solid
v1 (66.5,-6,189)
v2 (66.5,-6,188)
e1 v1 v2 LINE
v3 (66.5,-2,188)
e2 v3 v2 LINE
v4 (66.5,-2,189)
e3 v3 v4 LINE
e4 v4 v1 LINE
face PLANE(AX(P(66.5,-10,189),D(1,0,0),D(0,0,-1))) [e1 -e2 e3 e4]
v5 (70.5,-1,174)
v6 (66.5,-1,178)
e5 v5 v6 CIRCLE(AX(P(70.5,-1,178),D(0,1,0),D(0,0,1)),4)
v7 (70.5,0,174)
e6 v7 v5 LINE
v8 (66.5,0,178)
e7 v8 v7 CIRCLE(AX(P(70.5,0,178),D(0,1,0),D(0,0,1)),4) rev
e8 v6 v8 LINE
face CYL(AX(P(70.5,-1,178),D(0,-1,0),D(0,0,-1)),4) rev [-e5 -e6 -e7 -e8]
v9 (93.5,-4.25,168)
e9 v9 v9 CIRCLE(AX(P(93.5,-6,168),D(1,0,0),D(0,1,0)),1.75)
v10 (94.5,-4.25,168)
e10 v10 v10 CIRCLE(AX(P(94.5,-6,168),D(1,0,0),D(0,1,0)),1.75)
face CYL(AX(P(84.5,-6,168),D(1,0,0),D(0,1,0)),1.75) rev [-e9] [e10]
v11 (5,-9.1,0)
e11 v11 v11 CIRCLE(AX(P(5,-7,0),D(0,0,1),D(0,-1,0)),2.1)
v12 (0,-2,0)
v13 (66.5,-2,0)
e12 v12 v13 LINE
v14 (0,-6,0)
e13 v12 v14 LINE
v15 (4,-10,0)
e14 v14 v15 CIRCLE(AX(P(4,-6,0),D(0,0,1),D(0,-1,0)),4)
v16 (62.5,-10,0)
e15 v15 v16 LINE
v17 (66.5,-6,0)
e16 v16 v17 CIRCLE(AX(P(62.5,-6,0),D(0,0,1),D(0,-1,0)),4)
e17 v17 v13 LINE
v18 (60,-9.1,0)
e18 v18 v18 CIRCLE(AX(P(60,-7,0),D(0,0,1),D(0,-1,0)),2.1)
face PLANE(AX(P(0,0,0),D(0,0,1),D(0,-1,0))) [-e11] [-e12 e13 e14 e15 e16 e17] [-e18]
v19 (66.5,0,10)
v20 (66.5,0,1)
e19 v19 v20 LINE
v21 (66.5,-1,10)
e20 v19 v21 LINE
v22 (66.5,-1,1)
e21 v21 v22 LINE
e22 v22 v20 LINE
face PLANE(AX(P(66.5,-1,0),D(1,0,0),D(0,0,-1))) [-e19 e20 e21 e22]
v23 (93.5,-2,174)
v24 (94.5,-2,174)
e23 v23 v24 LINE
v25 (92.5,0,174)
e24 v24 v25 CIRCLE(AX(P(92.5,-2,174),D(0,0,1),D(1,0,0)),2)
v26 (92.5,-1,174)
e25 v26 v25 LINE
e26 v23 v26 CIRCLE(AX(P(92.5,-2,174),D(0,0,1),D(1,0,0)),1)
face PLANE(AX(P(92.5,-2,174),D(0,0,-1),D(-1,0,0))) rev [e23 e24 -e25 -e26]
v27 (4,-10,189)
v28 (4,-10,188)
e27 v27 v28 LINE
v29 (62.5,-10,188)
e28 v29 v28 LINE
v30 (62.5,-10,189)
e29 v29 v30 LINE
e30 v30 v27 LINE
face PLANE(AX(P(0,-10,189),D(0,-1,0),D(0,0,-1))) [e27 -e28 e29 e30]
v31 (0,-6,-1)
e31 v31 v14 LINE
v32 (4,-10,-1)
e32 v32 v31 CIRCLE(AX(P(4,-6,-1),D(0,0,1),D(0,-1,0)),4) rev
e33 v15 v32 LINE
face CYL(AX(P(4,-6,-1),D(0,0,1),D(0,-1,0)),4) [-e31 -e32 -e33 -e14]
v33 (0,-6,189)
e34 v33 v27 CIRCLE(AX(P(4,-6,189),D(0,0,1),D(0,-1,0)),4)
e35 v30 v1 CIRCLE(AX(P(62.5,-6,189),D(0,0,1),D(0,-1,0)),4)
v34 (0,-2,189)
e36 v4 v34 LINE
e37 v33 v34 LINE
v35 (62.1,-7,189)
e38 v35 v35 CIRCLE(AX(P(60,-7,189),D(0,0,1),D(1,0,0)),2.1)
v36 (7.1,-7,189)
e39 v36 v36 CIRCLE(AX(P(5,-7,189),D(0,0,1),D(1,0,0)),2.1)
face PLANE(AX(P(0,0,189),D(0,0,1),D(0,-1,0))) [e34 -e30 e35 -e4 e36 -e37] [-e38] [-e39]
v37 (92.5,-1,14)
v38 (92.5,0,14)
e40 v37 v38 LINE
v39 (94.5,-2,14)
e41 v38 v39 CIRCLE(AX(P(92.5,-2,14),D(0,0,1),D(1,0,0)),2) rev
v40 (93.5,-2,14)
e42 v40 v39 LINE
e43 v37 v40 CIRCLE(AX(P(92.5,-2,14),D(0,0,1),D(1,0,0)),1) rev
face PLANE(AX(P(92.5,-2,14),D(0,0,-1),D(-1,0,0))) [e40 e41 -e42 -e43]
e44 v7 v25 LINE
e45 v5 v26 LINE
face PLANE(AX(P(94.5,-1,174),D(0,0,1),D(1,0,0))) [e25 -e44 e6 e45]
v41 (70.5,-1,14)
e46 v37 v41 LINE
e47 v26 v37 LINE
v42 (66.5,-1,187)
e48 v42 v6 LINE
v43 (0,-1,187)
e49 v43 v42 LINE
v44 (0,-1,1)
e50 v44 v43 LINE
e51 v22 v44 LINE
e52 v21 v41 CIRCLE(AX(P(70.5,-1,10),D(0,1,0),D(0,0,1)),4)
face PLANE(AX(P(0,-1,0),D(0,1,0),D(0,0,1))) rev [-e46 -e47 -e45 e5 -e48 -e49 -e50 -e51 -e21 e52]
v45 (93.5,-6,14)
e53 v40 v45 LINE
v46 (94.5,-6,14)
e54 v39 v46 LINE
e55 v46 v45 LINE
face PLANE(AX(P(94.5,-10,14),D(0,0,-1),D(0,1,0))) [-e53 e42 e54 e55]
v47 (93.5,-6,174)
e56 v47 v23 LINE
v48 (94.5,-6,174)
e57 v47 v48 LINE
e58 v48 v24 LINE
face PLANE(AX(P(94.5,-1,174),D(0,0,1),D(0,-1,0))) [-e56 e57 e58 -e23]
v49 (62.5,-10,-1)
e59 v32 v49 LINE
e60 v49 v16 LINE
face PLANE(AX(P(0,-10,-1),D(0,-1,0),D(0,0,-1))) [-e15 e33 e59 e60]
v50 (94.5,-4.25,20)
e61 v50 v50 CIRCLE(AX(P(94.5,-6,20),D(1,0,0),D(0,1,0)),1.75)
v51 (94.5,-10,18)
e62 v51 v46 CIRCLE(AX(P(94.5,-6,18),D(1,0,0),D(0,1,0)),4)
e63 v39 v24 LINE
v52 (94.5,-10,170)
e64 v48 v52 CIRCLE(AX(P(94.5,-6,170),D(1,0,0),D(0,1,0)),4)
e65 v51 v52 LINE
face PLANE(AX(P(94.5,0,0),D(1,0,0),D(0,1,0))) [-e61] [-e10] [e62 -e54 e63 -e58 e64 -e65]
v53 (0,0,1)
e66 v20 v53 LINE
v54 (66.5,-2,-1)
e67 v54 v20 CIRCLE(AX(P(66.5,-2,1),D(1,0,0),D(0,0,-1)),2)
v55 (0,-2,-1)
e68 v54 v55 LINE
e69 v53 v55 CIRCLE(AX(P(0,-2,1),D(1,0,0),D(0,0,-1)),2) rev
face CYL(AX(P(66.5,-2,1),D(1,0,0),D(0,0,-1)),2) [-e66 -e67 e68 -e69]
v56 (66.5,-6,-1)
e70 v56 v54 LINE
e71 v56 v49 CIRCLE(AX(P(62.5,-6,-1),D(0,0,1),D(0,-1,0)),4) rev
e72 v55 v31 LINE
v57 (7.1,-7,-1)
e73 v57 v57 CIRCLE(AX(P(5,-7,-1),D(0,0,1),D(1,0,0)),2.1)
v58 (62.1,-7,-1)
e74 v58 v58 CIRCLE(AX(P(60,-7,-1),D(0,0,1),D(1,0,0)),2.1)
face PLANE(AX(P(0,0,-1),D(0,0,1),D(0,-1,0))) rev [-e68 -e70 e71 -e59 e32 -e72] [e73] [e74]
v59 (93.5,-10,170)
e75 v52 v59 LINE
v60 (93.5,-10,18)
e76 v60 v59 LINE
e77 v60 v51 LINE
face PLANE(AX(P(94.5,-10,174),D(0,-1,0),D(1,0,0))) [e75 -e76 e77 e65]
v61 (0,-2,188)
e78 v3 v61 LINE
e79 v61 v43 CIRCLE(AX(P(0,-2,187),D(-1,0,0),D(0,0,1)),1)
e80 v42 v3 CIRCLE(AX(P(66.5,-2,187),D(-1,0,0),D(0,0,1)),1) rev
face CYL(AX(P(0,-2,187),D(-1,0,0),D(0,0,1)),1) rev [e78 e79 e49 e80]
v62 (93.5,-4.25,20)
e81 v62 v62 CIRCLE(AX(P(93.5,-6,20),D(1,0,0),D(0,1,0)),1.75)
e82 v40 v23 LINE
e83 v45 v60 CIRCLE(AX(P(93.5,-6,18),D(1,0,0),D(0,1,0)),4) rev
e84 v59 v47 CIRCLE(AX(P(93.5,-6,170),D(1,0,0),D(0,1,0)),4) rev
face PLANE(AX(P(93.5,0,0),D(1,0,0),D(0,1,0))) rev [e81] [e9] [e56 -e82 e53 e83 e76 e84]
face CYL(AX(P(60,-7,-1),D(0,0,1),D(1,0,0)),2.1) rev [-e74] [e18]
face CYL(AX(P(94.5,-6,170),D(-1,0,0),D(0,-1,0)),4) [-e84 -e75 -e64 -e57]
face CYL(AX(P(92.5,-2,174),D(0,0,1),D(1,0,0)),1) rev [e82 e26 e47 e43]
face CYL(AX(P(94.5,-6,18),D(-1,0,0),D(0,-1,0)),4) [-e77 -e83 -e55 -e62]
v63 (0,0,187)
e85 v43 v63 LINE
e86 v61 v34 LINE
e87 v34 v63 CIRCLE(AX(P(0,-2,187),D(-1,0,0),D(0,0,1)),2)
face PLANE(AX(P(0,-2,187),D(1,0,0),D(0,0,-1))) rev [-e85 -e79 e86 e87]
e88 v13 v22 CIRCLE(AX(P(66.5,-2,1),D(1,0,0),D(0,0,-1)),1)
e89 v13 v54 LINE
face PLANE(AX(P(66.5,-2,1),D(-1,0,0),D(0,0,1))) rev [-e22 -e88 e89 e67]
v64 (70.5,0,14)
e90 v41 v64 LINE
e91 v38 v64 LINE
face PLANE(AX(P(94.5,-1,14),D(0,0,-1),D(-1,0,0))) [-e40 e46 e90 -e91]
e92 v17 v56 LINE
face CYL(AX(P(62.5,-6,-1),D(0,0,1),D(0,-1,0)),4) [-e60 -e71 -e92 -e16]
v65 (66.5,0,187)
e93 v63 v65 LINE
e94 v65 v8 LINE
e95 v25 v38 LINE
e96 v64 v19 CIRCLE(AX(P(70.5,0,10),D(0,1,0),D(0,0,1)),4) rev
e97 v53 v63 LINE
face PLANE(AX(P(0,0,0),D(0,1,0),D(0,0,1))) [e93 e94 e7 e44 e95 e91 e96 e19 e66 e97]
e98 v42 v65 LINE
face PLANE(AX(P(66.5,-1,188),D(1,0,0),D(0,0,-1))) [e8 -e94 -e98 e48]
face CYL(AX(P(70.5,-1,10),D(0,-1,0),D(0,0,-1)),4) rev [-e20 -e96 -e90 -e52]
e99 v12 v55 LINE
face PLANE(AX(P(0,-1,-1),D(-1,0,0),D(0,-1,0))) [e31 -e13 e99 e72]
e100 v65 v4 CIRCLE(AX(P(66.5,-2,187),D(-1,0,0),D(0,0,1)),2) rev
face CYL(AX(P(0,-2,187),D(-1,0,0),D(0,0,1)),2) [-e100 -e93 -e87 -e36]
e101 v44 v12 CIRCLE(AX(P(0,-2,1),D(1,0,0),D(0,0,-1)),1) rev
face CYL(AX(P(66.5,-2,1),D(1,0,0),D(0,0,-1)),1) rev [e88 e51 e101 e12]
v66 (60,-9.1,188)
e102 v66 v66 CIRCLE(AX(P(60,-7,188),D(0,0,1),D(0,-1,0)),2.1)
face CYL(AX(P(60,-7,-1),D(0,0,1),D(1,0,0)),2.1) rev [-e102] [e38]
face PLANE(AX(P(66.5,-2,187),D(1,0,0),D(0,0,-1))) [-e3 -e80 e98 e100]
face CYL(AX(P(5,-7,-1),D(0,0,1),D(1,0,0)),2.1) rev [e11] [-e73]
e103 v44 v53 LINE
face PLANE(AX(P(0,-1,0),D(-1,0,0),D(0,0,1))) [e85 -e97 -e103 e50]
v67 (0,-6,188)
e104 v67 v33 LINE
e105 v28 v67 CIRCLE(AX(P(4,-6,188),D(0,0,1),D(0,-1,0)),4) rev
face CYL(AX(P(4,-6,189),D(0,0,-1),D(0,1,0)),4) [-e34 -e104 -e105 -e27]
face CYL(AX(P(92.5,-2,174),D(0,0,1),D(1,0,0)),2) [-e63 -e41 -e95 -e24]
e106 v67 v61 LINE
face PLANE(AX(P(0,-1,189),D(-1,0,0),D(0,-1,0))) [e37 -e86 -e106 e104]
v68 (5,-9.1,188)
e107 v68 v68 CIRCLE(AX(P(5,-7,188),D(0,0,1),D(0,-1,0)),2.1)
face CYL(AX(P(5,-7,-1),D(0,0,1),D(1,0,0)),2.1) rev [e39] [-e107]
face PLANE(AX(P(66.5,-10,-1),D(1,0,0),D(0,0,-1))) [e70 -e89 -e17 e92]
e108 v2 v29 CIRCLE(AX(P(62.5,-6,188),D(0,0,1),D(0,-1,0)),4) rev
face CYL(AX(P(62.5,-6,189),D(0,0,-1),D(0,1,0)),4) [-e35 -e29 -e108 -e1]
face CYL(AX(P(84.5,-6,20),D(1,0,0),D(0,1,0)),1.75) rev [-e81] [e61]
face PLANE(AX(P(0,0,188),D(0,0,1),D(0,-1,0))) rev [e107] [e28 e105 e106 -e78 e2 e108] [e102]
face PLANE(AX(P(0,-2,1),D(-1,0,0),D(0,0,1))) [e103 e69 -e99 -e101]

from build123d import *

# Parameters (mm, degrees)
SM_BASE_FLANGE_1_DEPTH             = 1
SM_EDGE_FLANGE_1_STRIP_W           = 6
SM_EDGE_FLANGE_1_STRIP_H           = 1
SM_EDGE_FLANGE_1_STRIP_CUT_DEPTH   = 160
SM_EDGE_FLANGE_1_DEPTH             = 160
SM_EDGE_FLANGE_2_STRIP_W           = 6
SM_EDGE_FLANGE_2_STRIP_H           = 1
SM_EDGE_FLANGE_2_STRIP_CUT_DEPTH   = 66.5
SM_EDGE_FLANGE_2_STRIP_2_W         = 6
SM_EDGE_FLANGE_2_STRIP_2_H         = 1
SM_EDGE_FLANGE_2_STRIP_CUT_2_DEPTH = 66.5
SM_EDGE_FLANGE_2_DEPTH             = 66.5
SM_EDGE_FLANGE_2_BEND_DEPTH        = 66.5
SKETCH_15_R                        = 1.75
CUT_EXTRUDE_1_DEPTH                = 10
FILLET_1_R                         = 4
SKETCH_16_R                        = 2.1
CUT_EXTRUDE_2_DEPTH                = 213.438814721


# Sheet-metal steps are written as plain solids
with BuildPart() as part:
    # Sketch 1 → Базовая кромка1 (new body)
    with BuildSketch(Plane(origin=(0, 0, 0), x_dir=(1, 0, 0), z_dir=(0, 1, 0))):
        Polygon((0, 0), (66.5, 0), (66.5, -14), (94.5, -14), (94.5, -174), (66.5, -174), (66.5, -188), (0, -188), align=None)
    extrude(amount=-SM_BASE_FLANGE_1_DEPTH)

    # Ребро-кромка1 strip (across the edge) → Ребро-кромка1 strip cut (cut)
    with BuildSketch(Plane(origin=(94.5, -1, 14), x_dir=(-1, 0, 0), z_dir=(0, 0, 1))):
        with Locations((-1, -0.5)):
            Rectangle(SM_EDGE_FLANGE_1_STRIP_W, SM_EDGE_FLANGE_1_STRIP_H)
    extrude(amount=SM_EDGE_FLANGE_1_STRIP_CUT_DEPTH, mode=Mode.SUBTRACT)

    # Ребро-кромка1 section (across the edge) → Ребро-кромка1 (add)
    with BuildSketch(Plane(origin=(94.5, -1, 14), x_dir=(-1, 0, 0), z_dir=(0, 0, 1))):
        with BuildLine():
            Line((0, 1), (0, 9))
            Line((0, 9), (1, 9))
            Line((1, 9), (1, 1))
            ThreePointArc((1, 1), (1.292893219, 0.292893219), (2, 0))
            Line((2, 0), (2, -1))
            ThreePointArc((2, -1), (0.585786438, -0.414213562), (0, 1))
        make_face()
    extrude(amount=SM_EDGE_FLANGE_1_DEPTH)

    # Ребро-кромка2 strip (across the edge) → Ребро-кромка2 strip cut (cut)
    with BuildSketch(Plane(origin=(66.5, -1, 188), x_dir=(0, 0, -1), z_dir=(-1, 0, 0))):
        with Locations((-2, -0.5)):
            Rectangle(SM_EDGE_FLANGE_2_STRIP_W, SM_EDGE_FLANGE_2_STRIP_H)
    extrude(amount=SM_EDGE_FLANGE_2_STRIP_CUT_DEPTH, mode=Mode.SUBTRACT)

    # Ребро-кромка2 strip 2 (across the edge) → Ребро-кромка2 strip cut 2 (cut)
    with BuildSketch(Plane(origin=(0, -1, 0), x_dir=(0, 0, 1), z_dir=(1, 0, 0))):
        with Locations((-2, -0.5)):
            Rectangle(SM_EDGE_FLANGE_2_STRIP_2_W, SM_EDGE_FLANGE_2_STRIP_2_H)
    extrude(amount=SM_EDGE_FLANGE_2_STRIP_CUT_2_DEPTH, mode=Mode.SUBTRACT)

    # Ребро-кромка2 section (across the edge) → Ребро-кромка2 (add)
    with BuildSketch(Plane(origin=(66.5, -1, 188), x_dir=(0, 0, -1), z_dir=(-1, 0, 0))):
        with BuildLine():
            Line((-1, 1), (-1, 9))
            Line((-1, 9), (0, 9))
            Line((0, 9), (0, 1))
            ThreePointArc((0, 1), (0.292893219, 0.292893219), (1, 0))
            Line((1, 0), (1, -1))
            ThreePointArc((1, -1), (-0.414213562, -0.414213562), (-1, 1))
        make_face()
    extrude(amount=SM_EDGE_FLANGE_2_DEPTH)

    # Ребро-кромка2 section 2 (across the edge) → Ребро-кромка2 bend (add)
    with BuildSketch(Plane(origin=(0, -1, 0), x_dir=(0, 0, 1), z_dir=(1, 0, 0))):
        with BuildLine():
            Line((-1, 1), (-1, 9))
            Line((-1, 9), (0, 9))
            Line((0, 9), (0, 1))
            ThreePointArc((0, 1), (0.292893219, 0.292893219), (1, 0))
            Line((1, 0), (1, -1))
            ThreePointArc((1, -1), (-0.414213562, -0.414213562), (-1, 1))
        make_face()
    extrude(amount=SM_EDGE_FLANGE_2_BEND_DEPTH)

    # Эскиз15 → Вырез-Вытянуть1 (cut)
    with BuildSketch(Plane(origin=(94.5, 0, 0), x_dir=(0, 0, -1), z_dir=(1, 0, 0))):
        with Locations(Location((-168, -6, 0), (0, 0, 90))):
            Circle(SKETCH_15_R)
        with Locations(Location((-20, -6, 0), (0, 0, 90))):
            Circle(SKETCH_15_R)
    extrude(amount=-CUT_EXTRUDE_1_DEPTH, mode=Mode.SUBTRACT)

    # Скругление1
    fillet_1_edges = [part.edges().sort_by_distance(p)[0] for p in [
        (0, -10, -0.5),
        (66.5, -10, -0.5),
        (66.5, -0.5, 14),
        (66.5, -0.5, 174),
        (94, -10, 14),
        (94, -10, 174),
        (66.5, -10, 188.5),
        (0, -10, 188.5),
    ]]
    fillet(fillet_1_edges, radius=FILLET_1_R)

    # Эскиз16 → Вырез-Вытянуть2 (cut, through all)
    with BuildSketch(Plane.XY.offset(189)):
        with Locations((5, -7)):
            Circle(SKETCH_16_R)
        with Locations((60, -7)):
            Circle(SKETCH_16_R)
    extrude(amount=-CUT_EXTRUDE_2_DEPTH, mode=Mode.SUBTRACT)


solid = part.part
